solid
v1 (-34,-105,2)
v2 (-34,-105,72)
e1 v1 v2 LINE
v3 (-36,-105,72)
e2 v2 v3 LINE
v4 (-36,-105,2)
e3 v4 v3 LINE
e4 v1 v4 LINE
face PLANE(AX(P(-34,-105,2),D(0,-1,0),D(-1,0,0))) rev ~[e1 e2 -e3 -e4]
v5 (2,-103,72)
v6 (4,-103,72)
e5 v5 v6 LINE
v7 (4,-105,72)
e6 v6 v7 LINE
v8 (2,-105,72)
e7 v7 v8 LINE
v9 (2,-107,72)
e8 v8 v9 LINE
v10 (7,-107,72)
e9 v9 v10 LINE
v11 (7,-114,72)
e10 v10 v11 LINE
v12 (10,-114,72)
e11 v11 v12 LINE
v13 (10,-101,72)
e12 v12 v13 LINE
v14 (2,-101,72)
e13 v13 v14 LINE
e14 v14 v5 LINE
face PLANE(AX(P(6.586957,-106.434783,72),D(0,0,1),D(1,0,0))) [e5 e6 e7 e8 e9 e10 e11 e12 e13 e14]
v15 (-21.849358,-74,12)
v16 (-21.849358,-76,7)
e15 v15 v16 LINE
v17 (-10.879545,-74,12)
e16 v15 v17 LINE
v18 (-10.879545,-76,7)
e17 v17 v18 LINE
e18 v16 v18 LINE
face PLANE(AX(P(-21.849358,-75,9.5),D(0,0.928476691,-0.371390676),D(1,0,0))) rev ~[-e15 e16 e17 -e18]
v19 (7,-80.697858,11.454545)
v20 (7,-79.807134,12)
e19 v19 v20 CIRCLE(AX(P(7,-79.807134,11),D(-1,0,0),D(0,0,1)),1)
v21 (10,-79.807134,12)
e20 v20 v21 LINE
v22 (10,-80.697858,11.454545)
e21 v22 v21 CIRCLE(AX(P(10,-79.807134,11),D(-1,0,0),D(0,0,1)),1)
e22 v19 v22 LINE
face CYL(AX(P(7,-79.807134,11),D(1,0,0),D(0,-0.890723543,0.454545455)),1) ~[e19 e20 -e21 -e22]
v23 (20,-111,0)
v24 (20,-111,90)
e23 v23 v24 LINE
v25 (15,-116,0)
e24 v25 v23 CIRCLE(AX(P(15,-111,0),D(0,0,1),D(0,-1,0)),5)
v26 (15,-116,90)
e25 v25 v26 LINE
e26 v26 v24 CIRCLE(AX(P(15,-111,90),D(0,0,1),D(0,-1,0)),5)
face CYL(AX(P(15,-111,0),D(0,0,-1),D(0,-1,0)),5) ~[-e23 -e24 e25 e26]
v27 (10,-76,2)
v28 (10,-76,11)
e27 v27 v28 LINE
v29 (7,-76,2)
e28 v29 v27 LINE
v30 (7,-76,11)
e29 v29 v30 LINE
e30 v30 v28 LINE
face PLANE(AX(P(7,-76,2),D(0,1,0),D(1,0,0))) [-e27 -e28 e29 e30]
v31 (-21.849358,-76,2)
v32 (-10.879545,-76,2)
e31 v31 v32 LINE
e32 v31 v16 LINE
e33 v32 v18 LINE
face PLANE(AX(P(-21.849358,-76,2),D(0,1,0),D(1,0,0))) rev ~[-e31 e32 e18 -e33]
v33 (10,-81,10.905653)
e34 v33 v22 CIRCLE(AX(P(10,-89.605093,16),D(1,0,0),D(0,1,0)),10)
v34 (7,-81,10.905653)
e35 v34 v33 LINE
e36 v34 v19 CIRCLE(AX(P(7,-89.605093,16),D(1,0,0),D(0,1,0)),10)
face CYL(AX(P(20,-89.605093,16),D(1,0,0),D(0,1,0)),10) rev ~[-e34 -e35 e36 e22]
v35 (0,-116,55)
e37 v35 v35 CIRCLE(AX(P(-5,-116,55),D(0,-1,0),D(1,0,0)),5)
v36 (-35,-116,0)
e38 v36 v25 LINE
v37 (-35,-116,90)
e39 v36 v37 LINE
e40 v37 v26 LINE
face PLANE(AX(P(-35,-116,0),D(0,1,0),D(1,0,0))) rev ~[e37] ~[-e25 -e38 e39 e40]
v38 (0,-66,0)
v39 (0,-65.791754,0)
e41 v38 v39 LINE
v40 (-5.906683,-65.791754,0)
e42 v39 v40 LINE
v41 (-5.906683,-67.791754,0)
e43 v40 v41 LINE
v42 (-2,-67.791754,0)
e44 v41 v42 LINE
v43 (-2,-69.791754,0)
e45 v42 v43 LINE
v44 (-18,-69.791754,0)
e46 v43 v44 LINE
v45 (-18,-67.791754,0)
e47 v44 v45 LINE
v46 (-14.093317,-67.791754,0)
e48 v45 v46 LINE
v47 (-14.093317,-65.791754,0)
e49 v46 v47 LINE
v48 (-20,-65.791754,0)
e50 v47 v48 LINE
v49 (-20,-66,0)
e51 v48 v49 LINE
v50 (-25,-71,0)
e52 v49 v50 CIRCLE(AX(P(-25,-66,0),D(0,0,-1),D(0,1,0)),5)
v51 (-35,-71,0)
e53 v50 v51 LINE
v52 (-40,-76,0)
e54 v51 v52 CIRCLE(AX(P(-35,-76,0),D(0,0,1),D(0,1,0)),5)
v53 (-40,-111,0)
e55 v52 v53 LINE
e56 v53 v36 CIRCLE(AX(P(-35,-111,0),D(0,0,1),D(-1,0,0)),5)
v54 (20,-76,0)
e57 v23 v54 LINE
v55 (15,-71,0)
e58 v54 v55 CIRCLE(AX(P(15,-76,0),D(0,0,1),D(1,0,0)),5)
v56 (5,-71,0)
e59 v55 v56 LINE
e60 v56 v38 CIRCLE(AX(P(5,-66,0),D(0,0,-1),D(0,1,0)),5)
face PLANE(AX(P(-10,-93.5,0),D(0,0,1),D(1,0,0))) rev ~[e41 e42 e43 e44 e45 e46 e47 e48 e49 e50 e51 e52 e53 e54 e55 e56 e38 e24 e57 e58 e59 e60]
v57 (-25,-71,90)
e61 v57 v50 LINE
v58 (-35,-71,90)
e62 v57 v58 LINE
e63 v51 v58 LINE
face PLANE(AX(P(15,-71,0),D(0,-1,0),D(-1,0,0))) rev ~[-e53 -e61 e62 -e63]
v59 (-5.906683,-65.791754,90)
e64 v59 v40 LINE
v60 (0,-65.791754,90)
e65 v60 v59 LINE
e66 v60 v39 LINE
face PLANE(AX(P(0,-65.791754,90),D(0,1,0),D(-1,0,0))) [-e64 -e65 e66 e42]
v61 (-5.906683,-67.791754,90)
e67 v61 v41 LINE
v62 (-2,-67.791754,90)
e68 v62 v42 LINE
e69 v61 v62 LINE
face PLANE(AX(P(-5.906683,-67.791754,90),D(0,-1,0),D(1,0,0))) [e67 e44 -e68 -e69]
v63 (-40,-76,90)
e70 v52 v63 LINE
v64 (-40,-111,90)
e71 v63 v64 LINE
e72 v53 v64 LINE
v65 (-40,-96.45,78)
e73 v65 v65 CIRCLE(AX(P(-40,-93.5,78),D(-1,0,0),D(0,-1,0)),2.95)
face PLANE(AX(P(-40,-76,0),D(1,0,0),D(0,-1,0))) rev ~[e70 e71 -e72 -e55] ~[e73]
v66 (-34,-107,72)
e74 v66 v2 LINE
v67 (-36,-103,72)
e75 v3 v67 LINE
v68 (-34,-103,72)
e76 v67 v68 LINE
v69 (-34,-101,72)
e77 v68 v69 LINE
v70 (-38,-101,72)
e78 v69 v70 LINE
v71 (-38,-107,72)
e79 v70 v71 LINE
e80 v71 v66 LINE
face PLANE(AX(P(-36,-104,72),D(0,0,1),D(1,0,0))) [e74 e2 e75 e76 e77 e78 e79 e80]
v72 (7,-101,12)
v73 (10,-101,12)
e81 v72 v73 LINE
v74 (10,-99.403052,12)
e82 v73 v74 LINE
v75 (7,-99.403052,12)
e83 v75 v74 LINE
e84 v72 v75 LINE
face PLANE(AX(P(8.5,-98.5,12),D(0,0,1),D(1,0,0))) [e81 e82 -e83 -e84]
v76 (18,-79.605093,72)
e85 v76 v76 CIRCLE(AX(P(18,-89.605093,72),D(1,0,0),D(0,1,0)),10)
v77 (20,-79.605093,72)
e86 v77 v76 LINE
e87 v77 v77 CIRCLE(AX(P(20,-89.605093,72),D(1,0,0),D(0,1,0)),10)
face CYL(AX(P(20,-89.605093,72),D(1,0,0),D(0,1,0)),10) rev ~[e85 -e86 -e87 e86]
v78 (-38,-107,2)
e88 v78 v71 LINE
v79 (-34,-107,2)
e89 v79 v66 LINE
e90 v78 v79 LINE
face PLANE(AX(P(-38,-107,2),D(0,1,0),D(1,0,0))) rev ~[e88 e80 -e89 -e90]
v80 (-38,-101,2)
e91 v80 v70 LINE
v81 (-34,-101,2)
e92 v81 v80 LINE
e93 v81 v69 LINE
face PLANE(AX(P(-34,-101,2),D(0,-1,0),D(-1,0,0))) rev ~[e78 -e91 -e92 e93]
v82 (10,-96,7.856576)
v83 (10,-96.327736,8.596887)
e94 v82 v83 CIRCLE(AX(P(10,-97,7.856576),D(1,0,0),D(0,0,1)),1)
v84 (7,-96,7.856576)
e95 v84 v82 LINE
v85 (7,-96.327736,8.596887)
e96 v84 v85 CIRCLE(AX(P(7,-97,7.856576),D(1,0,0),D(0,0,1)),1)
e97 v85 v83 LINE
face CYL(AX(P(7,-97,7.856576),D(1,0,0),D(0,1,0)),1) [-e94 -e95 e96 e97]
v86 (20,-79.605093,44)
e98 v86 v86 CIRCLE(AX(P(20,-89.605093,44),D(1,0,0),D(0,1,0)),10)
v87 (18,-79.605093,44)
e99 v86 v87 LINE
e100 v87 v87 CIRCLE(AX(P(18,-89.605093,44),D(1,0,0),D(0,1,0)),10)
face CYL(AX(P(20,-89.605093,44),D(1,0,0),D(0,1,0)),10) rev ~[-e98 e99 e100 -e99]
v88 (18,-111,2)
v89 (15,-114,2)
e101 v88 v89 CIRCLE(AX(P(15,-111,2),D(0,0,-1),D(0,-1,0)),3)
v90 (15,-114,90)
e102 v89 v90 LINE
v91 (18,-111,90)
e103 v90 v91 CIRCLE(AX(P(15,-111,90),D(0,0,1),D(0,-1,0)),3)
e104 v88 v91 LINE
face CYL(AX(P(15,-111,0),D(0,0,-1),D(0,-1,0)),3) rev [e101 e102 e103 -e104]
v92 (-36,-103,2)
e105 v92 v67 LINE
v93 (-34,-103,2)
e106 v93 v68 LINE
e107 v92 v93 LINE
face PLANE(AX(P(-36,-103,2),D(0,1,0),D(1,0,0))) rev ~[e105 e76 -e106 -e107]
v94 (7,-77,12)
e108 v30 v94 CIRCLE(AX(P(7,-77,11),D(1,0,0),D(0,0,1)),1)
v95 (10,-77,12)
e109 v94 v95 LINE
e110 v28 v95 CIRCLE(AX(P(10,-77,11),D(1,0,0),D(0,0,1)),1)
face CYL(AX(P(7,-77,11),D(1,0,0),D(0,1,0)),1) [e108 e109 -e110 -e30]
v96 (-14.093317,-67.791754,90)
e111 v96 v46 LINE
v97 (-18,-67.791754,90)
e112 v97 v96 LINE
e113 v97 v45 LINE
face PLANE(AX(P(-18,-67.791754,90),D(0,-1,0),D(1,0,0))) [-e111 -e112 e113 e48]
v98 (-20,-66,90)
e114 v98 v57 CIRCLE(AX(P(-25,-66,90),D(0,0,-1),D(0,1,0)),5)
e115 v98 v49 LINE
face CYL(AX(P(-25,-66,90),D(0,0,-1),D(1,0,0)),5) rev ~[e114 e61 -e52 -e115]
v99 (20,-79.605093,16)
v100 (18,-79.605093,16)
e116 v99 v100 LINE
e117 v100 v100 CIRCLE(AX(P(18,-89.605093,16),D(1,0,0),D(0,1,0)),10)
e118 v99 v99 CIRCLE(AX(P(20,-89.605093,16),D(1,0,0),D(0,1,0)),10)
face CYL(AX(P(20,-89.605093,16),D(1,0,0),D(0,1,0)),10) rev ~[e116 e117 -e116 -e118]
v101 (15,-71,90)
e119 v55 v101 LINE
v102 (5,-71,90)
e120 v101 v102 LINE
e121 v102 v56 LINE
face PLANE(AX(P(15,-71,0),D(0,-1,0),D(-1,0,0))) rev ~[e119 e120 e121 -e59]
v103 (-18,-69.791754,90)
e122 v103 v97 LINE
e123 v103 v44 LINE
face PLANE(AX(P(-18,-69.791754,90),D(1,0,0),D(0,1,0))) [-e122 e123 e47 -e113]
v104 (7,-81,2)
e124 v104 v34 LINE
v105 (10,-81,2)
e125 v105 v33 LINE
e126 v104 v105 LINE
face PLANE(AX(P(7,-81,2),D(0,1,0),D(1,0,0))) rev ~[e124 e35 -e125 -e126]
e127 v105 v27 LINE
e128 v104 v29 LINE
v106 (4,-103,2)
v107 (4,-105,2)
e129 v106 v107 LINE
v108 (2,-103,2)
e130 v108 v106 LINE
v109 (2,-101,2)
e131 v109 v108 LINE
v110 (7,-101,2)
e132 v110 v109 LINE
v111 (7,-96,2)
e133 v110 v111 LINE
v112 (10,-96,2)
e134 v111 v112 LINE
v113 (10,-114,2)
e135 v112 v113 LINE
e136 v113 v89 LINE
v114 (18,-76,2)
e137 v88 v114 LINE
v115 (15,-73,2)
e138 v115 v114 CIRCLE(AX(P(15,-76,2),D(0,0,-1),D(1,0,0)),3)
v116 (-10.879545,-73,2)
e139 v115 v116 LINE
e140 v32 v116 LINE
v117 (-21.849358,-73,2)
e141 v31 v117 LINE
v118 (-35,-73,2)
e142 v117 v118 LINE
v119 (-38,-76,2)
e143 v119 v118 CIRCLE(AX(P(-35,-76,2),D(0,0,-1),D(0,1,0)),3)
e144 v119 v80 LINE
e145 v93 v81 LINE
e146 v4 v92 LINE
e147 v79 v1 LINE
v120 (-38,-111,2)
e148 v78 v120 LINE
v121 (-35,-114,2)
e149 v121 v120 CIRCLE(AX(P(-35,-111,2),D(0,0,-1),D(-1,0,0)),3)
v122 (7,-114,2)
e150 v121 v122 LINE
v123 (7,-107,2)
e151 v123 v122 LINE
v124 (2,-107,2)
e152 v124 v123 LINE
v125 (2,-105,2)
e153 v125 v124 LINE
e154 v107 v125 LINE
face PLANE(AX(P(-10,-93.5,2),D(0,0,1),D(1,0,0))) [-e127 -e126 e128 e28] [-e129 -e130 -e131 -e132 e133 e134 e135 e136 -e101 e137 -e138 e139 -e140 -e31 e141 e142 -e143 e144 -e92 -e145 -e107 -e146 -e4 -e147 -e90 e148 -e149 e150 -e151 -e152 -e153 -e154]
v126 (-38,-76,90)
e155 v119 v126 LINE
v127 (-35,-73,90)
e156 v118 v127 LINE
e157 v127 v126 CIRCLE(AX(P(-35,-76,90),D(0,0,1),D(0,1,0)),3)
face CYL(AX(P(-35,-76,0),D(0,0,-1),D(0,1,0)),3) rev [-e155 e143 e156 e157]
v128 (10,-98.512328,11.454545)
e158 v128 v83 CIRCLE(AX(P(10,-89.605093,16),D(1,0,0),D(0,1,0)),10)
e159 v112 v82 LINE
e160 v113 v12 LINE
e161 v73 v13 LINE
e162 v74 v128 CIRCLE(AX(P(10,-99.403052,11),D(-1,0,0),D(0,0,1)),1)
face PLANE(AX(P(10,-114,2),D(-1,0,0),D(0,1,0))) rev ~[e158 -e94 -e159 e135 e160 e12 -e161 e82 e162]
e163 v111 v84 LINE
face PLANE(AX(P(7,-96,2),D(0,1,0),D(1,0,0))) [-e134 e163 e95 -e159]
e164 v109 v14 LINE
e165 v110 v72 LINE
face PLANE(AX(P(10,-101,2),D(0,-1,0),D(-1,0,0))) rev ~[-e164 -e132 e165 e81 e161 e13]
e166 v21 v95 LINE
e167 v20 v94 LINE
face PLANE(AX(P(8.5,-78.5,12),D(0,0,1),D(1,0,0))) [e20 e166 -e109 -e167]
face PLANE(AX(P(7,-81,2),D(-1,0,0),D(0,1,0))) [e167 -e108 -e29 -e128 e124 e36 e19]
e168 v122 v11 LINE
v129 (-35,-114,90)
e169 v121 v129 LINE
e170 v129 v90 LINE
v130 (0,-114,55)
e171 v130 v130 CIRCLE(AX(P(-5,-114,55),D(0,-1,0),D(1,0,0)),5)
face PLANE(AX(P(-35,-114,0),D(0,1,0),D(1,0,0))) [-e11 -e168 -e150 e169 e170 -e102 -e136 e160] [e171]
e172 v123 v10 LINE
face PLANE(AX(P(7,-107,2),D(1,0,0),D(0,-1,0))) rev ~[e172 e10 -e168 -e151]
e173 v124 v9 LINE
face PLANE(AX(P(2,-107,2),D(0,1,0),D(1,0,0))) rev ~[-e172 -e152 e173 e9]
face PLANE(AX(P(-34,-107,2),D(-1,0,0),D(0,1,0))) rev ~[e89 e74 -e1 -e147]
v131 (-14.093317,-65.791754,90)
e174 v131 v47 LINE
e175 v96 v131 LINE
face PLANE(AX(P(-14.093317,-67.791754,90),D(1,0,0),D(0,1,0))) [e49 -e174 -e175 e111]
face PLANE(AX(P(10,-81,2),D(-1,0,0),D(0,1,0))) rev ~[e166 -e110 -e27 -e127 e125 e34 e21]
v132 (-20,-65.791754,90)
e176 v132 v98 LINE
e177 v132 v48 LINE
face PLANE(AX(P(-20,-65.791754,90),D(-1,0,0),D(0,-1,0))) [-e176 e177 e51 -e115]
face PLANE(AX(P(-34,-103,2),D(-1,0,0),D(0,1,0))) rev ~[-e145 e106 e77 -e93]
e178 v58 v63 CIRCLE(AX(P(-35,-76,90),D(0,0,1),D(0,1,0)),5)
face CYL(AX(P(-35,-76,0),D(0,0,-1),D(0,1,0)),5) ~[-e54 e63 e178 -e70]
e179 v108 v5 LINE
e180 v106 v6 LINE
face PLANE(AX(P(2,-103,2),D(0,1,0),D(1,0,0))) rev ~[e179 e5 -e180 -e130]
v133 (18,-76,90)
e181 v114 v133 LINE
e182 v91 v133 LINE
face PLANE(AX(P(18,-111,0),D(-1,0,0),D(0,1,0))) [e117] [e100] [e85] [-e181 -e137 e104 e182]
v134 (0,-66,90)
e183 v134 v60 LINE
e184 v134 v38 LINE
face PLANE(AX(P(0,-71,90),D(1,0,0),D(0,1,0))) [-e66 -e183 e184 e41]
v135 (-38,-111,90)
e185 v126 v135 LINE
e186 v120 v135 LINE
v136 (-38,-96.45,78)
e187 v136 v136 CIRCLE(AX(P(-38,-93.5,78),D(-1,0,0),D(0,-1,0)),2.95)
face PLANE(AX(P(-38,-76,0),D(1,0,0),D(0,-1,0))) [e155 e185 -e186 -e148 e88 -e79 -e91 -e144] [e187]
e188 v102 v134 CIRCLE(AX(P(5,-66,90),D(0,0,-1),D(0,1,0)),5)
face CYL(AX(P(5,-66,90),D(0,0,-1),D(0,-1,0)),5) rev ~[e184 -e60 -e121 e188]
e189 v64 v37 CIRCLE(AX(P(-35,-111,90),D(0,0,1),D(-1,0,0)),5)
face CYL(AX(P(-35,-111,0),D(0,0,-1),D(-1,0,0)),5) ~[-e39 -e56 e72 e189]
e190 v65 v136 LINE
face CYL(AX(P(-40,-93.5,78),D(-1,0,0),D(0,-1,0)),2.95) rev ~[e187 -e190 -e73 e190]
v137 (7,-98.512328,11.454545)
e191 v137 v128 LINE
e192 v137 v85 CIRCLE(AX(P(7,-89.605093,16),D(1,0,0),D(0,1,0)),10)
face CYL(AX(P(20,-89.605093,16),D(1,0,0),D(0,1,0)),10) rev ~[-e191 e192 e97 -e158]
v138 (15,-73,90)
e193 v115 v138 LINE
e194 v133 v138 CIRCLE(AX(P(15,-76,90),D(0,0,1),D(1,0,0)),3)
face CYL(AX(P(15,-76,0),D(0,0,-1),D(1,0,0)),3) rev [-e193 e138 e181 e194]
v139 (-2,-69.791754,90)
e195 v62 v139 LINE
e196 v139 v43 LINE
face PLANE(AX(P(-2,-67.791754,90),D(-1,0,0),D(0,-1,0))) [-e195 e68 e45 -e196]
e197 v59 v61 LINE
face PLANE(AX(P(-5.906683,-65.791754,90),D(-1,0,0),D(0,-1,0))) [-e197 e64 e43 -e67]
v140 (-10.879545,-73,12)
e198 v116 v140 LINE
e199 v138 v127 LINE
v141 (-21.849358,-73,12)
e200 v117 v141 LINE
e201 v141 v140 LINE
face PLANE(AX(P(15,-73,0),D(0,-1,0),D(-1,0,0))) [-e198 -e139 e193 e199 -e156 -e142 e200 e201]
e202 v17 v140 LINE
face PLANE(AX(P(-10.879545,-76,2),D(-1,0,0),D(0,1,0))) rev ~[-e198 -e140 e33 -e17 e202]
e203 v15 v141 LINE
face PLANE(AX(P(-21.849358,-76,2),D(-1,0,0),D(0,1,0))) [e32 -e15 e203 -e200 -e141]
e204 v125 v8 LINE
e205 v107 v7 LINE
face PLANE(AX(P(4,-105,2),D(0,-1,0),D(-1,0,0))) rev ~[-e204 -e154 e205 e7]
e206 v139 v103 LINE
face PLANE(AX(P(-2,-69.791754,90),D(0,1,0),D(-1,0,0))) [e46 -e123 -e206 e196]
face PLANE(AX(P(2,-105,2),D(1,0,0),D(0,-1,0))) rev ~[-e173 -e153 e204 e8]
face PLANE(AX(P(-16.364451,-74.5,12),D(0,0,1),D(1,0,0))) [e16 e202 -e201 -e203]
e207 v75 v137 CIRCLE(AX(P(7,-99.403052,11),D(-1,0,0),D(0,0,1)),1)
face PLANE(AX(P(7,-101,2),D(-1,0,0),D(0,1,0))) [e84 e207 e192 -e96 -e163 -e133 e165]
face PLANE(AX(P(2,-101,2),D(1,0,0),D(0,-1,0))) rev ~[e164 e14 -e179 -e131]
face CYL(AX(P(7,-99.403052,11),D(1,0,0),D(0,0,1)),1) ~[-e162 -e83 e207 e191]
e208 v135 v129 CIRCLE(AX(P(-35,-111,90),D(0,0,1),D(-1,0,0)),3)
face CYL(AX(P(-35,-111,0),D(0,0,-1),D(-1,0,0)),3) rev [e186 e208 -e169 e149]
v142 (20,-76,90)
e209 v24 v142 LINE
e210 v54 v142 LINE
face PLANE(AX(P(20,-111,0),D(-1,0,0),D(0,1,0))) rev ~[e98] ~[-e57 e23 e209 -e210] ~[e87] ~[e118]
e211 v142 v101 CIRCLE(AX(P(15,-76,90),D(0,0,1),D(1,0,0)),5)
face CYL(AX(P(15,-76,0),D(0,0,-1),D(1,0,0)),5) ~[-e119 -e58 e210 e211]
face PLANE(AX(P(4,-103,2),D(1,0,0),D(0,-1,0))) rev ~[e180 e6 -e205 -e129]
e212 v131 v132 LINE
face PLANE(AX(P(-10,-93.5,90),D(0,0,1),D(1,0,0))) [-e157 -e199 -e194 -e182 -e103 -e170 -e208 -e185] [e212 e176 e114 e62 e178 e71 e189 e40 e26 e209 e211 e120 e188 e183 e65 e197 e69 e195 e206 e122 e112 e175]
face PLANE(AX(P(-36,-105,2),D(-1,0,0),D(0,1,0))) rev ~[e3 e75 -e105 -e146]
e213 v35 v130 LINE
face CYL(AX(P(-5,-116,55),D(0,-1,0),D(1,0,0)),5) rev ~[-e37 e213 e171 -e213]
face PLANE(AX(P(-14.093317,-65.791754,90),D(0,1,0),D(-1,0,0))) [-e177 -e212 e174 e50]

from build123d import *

# Parameters (mm, degrees)
F1_DEPTH  = 90
F2_T      = -2
F4_DEPTH  = 90
F5_R      = 5
F6_DEPTH  = 25
F7_W      = 10.9698139131
F7_H      = 3
F7_W_2    = 3
F7_H_2    = 5
F8_DEPTH  = 10
F10_DEPTH = 70
F11_R     = 10
F12_DEPTH = 20
F13_R     = 5
F14_SIZE2 = 5
F14_SIZE  = 2
F15_R     = 1
F16_R     = 2.95
F17_DEPTH = 25


# Not quite as in the source:
# - a feature names something its author has since deleted; it is built from what else it names


with BuildPart() as f1:
    # F0 (on Top) → F1 (new body)
    with BuildSketch(Plane.XY):
        with BuildLine():
            Line((-35, -116), (0, -116))
            Line((0, -116), (15, -116))
            ThreePointArc((15, -116), (18.5355339059, -114.5355339059), (20, -111))
            Line((20, -111), (20, -76))
            ThreePointArc((20, -76), (18.5355339059, -72.4644660941), (15, -71))
            Line((15, -71), (-35, -71))
            ThreePointArc((-35, -71), (-38.5355339059, -72.4644660941), (-40, -76))
            Line((-40, -76), (-40, -111))
            ThreePointArc((-40, -111), (-38.5355339059, -114.5355339059), (-35, -116))
        make_face()
    extrude(amount=F1_DEPTH)

    # F2
    f2_openings = [f1.faces().sort_by_distance(p)[0] for p in [
        (-10, -93.5, 90),
    ]]
    offset(amount=F2_T, openings=f2_openings)

    # F3 (on face) → F4 (join, through all)
    with BuildSketch(Plane.XY.offset(90)):
        Polygon((-20, -65.7917543815), (-20, -71), (-10, -71), (0, -71), (0, -65.7917543815), (-5.9066830128, -65.7917543815), (-5.9066830128, -67.7917543815), (-2, -67.7917543815), (-2, -69.7917543815), (-18, -69.7917543815), (-18, -67.7917543815), (-14.0933169872, -67.7917543815), (-14.0933169872, -65.7917543815), align=None)
    extrude(amount=-F4_DEPTH)

    # F5 (on face) → F6 (cut)
    with BuildSketch(Plane.XZ.offset(116)):
        with Locations((-5, 55)):
            Circle(F5_R)
    extrude(amount=-F6_DEPTH, mode=Mode.SUBTRACT)

    # F7 (on face) → F8 (join)
    with BuildSketch(Plane.XY.offset(2)):
        with Locations((-16.3644514978, -74.5)):
            Rectangle(F7_W, F7_H)
        with Locations((8.5, -78.5)):
            Rectangle(F7_W_2, F7_H_2)
        with Locations((8.5, -98.5)):
            Rectangle(F7_W_2, F7_H_2)
    extrude(amount=F8_DEPTH)

    # F9 (on face) → F10 (join)
    with BuildSketch(Plane.XY.offset(2)):
        Polygon((-34, -101), (-38, -101), (-38, -107), (-34, -107), (-34, -105), (-36, -105), (-36, -103), (-34, -103), align=None)
        Polygon((7, -101), (2, -101), (2, -103), (4, -103), (4, -105), (2, -105), (2, -107), (7, -107), (7, -114), (10, -114), (10, -107), (10, -101), align=None)
    extrude(amount=F10_DEPTH)

    # F11 (on face) → F12 (cut)
    with BuildSketch(Plane.YZ.offset(20)):
        with Locations((-89.6050930023, 72)):
            Circle(F11_R)
        with Locations((-89.6050930023, 44)):
            Circle(F11_R)
        with Locations((-89.6050930023, 16)):
            Circle(F11_R)
    extrude(amount=-F12_DEPTH, mode=Mode.SUBTRACT)

    # F13
    f13_edges = [f1.edges().sort_by_distance(p)[0] for p in [
        (0, -71, 45),
        (-20, -71, 45),
    ]]
    fillet(f13_edges, radius=F13_R)

    # F14
    f14_edges = [f1.edges().sort_by_distance(p)[0] for p in [
        (-16.364451, -76, 12),
    ]]
    f14_side = f1.faces().sort_by_distance((-16.364451, -74.5, 12))[0]
    chamfer(f14_edges, length=F14_SIZE, length2=F14_SIZE2, reference=f14_side)

    # F15
    f15_edges = [f1.edges().sort_by_distance(p)[0] for p in [
        (8.5, -80.439942, 12),
        (8.5, -76, 12),
        (8.5, -98.770244, 12),
        (8.5, -96, 8.312012),
    ]]
    fillet(f15_edges, radius=F15_R)

    # F16 (on face) → F17 (cut)
    with BuildSketch(Plane(origin=(-40, 0, 0), x_dir=(0, -1, 0), z_dir=(-1, 0, 0))):
        with Locations((93.5, 78)):
            Circle(F16_R)
    extrude(amount=-F17_DEPTH, mode=Mode.SUBTRACT)


solid = f1.part
